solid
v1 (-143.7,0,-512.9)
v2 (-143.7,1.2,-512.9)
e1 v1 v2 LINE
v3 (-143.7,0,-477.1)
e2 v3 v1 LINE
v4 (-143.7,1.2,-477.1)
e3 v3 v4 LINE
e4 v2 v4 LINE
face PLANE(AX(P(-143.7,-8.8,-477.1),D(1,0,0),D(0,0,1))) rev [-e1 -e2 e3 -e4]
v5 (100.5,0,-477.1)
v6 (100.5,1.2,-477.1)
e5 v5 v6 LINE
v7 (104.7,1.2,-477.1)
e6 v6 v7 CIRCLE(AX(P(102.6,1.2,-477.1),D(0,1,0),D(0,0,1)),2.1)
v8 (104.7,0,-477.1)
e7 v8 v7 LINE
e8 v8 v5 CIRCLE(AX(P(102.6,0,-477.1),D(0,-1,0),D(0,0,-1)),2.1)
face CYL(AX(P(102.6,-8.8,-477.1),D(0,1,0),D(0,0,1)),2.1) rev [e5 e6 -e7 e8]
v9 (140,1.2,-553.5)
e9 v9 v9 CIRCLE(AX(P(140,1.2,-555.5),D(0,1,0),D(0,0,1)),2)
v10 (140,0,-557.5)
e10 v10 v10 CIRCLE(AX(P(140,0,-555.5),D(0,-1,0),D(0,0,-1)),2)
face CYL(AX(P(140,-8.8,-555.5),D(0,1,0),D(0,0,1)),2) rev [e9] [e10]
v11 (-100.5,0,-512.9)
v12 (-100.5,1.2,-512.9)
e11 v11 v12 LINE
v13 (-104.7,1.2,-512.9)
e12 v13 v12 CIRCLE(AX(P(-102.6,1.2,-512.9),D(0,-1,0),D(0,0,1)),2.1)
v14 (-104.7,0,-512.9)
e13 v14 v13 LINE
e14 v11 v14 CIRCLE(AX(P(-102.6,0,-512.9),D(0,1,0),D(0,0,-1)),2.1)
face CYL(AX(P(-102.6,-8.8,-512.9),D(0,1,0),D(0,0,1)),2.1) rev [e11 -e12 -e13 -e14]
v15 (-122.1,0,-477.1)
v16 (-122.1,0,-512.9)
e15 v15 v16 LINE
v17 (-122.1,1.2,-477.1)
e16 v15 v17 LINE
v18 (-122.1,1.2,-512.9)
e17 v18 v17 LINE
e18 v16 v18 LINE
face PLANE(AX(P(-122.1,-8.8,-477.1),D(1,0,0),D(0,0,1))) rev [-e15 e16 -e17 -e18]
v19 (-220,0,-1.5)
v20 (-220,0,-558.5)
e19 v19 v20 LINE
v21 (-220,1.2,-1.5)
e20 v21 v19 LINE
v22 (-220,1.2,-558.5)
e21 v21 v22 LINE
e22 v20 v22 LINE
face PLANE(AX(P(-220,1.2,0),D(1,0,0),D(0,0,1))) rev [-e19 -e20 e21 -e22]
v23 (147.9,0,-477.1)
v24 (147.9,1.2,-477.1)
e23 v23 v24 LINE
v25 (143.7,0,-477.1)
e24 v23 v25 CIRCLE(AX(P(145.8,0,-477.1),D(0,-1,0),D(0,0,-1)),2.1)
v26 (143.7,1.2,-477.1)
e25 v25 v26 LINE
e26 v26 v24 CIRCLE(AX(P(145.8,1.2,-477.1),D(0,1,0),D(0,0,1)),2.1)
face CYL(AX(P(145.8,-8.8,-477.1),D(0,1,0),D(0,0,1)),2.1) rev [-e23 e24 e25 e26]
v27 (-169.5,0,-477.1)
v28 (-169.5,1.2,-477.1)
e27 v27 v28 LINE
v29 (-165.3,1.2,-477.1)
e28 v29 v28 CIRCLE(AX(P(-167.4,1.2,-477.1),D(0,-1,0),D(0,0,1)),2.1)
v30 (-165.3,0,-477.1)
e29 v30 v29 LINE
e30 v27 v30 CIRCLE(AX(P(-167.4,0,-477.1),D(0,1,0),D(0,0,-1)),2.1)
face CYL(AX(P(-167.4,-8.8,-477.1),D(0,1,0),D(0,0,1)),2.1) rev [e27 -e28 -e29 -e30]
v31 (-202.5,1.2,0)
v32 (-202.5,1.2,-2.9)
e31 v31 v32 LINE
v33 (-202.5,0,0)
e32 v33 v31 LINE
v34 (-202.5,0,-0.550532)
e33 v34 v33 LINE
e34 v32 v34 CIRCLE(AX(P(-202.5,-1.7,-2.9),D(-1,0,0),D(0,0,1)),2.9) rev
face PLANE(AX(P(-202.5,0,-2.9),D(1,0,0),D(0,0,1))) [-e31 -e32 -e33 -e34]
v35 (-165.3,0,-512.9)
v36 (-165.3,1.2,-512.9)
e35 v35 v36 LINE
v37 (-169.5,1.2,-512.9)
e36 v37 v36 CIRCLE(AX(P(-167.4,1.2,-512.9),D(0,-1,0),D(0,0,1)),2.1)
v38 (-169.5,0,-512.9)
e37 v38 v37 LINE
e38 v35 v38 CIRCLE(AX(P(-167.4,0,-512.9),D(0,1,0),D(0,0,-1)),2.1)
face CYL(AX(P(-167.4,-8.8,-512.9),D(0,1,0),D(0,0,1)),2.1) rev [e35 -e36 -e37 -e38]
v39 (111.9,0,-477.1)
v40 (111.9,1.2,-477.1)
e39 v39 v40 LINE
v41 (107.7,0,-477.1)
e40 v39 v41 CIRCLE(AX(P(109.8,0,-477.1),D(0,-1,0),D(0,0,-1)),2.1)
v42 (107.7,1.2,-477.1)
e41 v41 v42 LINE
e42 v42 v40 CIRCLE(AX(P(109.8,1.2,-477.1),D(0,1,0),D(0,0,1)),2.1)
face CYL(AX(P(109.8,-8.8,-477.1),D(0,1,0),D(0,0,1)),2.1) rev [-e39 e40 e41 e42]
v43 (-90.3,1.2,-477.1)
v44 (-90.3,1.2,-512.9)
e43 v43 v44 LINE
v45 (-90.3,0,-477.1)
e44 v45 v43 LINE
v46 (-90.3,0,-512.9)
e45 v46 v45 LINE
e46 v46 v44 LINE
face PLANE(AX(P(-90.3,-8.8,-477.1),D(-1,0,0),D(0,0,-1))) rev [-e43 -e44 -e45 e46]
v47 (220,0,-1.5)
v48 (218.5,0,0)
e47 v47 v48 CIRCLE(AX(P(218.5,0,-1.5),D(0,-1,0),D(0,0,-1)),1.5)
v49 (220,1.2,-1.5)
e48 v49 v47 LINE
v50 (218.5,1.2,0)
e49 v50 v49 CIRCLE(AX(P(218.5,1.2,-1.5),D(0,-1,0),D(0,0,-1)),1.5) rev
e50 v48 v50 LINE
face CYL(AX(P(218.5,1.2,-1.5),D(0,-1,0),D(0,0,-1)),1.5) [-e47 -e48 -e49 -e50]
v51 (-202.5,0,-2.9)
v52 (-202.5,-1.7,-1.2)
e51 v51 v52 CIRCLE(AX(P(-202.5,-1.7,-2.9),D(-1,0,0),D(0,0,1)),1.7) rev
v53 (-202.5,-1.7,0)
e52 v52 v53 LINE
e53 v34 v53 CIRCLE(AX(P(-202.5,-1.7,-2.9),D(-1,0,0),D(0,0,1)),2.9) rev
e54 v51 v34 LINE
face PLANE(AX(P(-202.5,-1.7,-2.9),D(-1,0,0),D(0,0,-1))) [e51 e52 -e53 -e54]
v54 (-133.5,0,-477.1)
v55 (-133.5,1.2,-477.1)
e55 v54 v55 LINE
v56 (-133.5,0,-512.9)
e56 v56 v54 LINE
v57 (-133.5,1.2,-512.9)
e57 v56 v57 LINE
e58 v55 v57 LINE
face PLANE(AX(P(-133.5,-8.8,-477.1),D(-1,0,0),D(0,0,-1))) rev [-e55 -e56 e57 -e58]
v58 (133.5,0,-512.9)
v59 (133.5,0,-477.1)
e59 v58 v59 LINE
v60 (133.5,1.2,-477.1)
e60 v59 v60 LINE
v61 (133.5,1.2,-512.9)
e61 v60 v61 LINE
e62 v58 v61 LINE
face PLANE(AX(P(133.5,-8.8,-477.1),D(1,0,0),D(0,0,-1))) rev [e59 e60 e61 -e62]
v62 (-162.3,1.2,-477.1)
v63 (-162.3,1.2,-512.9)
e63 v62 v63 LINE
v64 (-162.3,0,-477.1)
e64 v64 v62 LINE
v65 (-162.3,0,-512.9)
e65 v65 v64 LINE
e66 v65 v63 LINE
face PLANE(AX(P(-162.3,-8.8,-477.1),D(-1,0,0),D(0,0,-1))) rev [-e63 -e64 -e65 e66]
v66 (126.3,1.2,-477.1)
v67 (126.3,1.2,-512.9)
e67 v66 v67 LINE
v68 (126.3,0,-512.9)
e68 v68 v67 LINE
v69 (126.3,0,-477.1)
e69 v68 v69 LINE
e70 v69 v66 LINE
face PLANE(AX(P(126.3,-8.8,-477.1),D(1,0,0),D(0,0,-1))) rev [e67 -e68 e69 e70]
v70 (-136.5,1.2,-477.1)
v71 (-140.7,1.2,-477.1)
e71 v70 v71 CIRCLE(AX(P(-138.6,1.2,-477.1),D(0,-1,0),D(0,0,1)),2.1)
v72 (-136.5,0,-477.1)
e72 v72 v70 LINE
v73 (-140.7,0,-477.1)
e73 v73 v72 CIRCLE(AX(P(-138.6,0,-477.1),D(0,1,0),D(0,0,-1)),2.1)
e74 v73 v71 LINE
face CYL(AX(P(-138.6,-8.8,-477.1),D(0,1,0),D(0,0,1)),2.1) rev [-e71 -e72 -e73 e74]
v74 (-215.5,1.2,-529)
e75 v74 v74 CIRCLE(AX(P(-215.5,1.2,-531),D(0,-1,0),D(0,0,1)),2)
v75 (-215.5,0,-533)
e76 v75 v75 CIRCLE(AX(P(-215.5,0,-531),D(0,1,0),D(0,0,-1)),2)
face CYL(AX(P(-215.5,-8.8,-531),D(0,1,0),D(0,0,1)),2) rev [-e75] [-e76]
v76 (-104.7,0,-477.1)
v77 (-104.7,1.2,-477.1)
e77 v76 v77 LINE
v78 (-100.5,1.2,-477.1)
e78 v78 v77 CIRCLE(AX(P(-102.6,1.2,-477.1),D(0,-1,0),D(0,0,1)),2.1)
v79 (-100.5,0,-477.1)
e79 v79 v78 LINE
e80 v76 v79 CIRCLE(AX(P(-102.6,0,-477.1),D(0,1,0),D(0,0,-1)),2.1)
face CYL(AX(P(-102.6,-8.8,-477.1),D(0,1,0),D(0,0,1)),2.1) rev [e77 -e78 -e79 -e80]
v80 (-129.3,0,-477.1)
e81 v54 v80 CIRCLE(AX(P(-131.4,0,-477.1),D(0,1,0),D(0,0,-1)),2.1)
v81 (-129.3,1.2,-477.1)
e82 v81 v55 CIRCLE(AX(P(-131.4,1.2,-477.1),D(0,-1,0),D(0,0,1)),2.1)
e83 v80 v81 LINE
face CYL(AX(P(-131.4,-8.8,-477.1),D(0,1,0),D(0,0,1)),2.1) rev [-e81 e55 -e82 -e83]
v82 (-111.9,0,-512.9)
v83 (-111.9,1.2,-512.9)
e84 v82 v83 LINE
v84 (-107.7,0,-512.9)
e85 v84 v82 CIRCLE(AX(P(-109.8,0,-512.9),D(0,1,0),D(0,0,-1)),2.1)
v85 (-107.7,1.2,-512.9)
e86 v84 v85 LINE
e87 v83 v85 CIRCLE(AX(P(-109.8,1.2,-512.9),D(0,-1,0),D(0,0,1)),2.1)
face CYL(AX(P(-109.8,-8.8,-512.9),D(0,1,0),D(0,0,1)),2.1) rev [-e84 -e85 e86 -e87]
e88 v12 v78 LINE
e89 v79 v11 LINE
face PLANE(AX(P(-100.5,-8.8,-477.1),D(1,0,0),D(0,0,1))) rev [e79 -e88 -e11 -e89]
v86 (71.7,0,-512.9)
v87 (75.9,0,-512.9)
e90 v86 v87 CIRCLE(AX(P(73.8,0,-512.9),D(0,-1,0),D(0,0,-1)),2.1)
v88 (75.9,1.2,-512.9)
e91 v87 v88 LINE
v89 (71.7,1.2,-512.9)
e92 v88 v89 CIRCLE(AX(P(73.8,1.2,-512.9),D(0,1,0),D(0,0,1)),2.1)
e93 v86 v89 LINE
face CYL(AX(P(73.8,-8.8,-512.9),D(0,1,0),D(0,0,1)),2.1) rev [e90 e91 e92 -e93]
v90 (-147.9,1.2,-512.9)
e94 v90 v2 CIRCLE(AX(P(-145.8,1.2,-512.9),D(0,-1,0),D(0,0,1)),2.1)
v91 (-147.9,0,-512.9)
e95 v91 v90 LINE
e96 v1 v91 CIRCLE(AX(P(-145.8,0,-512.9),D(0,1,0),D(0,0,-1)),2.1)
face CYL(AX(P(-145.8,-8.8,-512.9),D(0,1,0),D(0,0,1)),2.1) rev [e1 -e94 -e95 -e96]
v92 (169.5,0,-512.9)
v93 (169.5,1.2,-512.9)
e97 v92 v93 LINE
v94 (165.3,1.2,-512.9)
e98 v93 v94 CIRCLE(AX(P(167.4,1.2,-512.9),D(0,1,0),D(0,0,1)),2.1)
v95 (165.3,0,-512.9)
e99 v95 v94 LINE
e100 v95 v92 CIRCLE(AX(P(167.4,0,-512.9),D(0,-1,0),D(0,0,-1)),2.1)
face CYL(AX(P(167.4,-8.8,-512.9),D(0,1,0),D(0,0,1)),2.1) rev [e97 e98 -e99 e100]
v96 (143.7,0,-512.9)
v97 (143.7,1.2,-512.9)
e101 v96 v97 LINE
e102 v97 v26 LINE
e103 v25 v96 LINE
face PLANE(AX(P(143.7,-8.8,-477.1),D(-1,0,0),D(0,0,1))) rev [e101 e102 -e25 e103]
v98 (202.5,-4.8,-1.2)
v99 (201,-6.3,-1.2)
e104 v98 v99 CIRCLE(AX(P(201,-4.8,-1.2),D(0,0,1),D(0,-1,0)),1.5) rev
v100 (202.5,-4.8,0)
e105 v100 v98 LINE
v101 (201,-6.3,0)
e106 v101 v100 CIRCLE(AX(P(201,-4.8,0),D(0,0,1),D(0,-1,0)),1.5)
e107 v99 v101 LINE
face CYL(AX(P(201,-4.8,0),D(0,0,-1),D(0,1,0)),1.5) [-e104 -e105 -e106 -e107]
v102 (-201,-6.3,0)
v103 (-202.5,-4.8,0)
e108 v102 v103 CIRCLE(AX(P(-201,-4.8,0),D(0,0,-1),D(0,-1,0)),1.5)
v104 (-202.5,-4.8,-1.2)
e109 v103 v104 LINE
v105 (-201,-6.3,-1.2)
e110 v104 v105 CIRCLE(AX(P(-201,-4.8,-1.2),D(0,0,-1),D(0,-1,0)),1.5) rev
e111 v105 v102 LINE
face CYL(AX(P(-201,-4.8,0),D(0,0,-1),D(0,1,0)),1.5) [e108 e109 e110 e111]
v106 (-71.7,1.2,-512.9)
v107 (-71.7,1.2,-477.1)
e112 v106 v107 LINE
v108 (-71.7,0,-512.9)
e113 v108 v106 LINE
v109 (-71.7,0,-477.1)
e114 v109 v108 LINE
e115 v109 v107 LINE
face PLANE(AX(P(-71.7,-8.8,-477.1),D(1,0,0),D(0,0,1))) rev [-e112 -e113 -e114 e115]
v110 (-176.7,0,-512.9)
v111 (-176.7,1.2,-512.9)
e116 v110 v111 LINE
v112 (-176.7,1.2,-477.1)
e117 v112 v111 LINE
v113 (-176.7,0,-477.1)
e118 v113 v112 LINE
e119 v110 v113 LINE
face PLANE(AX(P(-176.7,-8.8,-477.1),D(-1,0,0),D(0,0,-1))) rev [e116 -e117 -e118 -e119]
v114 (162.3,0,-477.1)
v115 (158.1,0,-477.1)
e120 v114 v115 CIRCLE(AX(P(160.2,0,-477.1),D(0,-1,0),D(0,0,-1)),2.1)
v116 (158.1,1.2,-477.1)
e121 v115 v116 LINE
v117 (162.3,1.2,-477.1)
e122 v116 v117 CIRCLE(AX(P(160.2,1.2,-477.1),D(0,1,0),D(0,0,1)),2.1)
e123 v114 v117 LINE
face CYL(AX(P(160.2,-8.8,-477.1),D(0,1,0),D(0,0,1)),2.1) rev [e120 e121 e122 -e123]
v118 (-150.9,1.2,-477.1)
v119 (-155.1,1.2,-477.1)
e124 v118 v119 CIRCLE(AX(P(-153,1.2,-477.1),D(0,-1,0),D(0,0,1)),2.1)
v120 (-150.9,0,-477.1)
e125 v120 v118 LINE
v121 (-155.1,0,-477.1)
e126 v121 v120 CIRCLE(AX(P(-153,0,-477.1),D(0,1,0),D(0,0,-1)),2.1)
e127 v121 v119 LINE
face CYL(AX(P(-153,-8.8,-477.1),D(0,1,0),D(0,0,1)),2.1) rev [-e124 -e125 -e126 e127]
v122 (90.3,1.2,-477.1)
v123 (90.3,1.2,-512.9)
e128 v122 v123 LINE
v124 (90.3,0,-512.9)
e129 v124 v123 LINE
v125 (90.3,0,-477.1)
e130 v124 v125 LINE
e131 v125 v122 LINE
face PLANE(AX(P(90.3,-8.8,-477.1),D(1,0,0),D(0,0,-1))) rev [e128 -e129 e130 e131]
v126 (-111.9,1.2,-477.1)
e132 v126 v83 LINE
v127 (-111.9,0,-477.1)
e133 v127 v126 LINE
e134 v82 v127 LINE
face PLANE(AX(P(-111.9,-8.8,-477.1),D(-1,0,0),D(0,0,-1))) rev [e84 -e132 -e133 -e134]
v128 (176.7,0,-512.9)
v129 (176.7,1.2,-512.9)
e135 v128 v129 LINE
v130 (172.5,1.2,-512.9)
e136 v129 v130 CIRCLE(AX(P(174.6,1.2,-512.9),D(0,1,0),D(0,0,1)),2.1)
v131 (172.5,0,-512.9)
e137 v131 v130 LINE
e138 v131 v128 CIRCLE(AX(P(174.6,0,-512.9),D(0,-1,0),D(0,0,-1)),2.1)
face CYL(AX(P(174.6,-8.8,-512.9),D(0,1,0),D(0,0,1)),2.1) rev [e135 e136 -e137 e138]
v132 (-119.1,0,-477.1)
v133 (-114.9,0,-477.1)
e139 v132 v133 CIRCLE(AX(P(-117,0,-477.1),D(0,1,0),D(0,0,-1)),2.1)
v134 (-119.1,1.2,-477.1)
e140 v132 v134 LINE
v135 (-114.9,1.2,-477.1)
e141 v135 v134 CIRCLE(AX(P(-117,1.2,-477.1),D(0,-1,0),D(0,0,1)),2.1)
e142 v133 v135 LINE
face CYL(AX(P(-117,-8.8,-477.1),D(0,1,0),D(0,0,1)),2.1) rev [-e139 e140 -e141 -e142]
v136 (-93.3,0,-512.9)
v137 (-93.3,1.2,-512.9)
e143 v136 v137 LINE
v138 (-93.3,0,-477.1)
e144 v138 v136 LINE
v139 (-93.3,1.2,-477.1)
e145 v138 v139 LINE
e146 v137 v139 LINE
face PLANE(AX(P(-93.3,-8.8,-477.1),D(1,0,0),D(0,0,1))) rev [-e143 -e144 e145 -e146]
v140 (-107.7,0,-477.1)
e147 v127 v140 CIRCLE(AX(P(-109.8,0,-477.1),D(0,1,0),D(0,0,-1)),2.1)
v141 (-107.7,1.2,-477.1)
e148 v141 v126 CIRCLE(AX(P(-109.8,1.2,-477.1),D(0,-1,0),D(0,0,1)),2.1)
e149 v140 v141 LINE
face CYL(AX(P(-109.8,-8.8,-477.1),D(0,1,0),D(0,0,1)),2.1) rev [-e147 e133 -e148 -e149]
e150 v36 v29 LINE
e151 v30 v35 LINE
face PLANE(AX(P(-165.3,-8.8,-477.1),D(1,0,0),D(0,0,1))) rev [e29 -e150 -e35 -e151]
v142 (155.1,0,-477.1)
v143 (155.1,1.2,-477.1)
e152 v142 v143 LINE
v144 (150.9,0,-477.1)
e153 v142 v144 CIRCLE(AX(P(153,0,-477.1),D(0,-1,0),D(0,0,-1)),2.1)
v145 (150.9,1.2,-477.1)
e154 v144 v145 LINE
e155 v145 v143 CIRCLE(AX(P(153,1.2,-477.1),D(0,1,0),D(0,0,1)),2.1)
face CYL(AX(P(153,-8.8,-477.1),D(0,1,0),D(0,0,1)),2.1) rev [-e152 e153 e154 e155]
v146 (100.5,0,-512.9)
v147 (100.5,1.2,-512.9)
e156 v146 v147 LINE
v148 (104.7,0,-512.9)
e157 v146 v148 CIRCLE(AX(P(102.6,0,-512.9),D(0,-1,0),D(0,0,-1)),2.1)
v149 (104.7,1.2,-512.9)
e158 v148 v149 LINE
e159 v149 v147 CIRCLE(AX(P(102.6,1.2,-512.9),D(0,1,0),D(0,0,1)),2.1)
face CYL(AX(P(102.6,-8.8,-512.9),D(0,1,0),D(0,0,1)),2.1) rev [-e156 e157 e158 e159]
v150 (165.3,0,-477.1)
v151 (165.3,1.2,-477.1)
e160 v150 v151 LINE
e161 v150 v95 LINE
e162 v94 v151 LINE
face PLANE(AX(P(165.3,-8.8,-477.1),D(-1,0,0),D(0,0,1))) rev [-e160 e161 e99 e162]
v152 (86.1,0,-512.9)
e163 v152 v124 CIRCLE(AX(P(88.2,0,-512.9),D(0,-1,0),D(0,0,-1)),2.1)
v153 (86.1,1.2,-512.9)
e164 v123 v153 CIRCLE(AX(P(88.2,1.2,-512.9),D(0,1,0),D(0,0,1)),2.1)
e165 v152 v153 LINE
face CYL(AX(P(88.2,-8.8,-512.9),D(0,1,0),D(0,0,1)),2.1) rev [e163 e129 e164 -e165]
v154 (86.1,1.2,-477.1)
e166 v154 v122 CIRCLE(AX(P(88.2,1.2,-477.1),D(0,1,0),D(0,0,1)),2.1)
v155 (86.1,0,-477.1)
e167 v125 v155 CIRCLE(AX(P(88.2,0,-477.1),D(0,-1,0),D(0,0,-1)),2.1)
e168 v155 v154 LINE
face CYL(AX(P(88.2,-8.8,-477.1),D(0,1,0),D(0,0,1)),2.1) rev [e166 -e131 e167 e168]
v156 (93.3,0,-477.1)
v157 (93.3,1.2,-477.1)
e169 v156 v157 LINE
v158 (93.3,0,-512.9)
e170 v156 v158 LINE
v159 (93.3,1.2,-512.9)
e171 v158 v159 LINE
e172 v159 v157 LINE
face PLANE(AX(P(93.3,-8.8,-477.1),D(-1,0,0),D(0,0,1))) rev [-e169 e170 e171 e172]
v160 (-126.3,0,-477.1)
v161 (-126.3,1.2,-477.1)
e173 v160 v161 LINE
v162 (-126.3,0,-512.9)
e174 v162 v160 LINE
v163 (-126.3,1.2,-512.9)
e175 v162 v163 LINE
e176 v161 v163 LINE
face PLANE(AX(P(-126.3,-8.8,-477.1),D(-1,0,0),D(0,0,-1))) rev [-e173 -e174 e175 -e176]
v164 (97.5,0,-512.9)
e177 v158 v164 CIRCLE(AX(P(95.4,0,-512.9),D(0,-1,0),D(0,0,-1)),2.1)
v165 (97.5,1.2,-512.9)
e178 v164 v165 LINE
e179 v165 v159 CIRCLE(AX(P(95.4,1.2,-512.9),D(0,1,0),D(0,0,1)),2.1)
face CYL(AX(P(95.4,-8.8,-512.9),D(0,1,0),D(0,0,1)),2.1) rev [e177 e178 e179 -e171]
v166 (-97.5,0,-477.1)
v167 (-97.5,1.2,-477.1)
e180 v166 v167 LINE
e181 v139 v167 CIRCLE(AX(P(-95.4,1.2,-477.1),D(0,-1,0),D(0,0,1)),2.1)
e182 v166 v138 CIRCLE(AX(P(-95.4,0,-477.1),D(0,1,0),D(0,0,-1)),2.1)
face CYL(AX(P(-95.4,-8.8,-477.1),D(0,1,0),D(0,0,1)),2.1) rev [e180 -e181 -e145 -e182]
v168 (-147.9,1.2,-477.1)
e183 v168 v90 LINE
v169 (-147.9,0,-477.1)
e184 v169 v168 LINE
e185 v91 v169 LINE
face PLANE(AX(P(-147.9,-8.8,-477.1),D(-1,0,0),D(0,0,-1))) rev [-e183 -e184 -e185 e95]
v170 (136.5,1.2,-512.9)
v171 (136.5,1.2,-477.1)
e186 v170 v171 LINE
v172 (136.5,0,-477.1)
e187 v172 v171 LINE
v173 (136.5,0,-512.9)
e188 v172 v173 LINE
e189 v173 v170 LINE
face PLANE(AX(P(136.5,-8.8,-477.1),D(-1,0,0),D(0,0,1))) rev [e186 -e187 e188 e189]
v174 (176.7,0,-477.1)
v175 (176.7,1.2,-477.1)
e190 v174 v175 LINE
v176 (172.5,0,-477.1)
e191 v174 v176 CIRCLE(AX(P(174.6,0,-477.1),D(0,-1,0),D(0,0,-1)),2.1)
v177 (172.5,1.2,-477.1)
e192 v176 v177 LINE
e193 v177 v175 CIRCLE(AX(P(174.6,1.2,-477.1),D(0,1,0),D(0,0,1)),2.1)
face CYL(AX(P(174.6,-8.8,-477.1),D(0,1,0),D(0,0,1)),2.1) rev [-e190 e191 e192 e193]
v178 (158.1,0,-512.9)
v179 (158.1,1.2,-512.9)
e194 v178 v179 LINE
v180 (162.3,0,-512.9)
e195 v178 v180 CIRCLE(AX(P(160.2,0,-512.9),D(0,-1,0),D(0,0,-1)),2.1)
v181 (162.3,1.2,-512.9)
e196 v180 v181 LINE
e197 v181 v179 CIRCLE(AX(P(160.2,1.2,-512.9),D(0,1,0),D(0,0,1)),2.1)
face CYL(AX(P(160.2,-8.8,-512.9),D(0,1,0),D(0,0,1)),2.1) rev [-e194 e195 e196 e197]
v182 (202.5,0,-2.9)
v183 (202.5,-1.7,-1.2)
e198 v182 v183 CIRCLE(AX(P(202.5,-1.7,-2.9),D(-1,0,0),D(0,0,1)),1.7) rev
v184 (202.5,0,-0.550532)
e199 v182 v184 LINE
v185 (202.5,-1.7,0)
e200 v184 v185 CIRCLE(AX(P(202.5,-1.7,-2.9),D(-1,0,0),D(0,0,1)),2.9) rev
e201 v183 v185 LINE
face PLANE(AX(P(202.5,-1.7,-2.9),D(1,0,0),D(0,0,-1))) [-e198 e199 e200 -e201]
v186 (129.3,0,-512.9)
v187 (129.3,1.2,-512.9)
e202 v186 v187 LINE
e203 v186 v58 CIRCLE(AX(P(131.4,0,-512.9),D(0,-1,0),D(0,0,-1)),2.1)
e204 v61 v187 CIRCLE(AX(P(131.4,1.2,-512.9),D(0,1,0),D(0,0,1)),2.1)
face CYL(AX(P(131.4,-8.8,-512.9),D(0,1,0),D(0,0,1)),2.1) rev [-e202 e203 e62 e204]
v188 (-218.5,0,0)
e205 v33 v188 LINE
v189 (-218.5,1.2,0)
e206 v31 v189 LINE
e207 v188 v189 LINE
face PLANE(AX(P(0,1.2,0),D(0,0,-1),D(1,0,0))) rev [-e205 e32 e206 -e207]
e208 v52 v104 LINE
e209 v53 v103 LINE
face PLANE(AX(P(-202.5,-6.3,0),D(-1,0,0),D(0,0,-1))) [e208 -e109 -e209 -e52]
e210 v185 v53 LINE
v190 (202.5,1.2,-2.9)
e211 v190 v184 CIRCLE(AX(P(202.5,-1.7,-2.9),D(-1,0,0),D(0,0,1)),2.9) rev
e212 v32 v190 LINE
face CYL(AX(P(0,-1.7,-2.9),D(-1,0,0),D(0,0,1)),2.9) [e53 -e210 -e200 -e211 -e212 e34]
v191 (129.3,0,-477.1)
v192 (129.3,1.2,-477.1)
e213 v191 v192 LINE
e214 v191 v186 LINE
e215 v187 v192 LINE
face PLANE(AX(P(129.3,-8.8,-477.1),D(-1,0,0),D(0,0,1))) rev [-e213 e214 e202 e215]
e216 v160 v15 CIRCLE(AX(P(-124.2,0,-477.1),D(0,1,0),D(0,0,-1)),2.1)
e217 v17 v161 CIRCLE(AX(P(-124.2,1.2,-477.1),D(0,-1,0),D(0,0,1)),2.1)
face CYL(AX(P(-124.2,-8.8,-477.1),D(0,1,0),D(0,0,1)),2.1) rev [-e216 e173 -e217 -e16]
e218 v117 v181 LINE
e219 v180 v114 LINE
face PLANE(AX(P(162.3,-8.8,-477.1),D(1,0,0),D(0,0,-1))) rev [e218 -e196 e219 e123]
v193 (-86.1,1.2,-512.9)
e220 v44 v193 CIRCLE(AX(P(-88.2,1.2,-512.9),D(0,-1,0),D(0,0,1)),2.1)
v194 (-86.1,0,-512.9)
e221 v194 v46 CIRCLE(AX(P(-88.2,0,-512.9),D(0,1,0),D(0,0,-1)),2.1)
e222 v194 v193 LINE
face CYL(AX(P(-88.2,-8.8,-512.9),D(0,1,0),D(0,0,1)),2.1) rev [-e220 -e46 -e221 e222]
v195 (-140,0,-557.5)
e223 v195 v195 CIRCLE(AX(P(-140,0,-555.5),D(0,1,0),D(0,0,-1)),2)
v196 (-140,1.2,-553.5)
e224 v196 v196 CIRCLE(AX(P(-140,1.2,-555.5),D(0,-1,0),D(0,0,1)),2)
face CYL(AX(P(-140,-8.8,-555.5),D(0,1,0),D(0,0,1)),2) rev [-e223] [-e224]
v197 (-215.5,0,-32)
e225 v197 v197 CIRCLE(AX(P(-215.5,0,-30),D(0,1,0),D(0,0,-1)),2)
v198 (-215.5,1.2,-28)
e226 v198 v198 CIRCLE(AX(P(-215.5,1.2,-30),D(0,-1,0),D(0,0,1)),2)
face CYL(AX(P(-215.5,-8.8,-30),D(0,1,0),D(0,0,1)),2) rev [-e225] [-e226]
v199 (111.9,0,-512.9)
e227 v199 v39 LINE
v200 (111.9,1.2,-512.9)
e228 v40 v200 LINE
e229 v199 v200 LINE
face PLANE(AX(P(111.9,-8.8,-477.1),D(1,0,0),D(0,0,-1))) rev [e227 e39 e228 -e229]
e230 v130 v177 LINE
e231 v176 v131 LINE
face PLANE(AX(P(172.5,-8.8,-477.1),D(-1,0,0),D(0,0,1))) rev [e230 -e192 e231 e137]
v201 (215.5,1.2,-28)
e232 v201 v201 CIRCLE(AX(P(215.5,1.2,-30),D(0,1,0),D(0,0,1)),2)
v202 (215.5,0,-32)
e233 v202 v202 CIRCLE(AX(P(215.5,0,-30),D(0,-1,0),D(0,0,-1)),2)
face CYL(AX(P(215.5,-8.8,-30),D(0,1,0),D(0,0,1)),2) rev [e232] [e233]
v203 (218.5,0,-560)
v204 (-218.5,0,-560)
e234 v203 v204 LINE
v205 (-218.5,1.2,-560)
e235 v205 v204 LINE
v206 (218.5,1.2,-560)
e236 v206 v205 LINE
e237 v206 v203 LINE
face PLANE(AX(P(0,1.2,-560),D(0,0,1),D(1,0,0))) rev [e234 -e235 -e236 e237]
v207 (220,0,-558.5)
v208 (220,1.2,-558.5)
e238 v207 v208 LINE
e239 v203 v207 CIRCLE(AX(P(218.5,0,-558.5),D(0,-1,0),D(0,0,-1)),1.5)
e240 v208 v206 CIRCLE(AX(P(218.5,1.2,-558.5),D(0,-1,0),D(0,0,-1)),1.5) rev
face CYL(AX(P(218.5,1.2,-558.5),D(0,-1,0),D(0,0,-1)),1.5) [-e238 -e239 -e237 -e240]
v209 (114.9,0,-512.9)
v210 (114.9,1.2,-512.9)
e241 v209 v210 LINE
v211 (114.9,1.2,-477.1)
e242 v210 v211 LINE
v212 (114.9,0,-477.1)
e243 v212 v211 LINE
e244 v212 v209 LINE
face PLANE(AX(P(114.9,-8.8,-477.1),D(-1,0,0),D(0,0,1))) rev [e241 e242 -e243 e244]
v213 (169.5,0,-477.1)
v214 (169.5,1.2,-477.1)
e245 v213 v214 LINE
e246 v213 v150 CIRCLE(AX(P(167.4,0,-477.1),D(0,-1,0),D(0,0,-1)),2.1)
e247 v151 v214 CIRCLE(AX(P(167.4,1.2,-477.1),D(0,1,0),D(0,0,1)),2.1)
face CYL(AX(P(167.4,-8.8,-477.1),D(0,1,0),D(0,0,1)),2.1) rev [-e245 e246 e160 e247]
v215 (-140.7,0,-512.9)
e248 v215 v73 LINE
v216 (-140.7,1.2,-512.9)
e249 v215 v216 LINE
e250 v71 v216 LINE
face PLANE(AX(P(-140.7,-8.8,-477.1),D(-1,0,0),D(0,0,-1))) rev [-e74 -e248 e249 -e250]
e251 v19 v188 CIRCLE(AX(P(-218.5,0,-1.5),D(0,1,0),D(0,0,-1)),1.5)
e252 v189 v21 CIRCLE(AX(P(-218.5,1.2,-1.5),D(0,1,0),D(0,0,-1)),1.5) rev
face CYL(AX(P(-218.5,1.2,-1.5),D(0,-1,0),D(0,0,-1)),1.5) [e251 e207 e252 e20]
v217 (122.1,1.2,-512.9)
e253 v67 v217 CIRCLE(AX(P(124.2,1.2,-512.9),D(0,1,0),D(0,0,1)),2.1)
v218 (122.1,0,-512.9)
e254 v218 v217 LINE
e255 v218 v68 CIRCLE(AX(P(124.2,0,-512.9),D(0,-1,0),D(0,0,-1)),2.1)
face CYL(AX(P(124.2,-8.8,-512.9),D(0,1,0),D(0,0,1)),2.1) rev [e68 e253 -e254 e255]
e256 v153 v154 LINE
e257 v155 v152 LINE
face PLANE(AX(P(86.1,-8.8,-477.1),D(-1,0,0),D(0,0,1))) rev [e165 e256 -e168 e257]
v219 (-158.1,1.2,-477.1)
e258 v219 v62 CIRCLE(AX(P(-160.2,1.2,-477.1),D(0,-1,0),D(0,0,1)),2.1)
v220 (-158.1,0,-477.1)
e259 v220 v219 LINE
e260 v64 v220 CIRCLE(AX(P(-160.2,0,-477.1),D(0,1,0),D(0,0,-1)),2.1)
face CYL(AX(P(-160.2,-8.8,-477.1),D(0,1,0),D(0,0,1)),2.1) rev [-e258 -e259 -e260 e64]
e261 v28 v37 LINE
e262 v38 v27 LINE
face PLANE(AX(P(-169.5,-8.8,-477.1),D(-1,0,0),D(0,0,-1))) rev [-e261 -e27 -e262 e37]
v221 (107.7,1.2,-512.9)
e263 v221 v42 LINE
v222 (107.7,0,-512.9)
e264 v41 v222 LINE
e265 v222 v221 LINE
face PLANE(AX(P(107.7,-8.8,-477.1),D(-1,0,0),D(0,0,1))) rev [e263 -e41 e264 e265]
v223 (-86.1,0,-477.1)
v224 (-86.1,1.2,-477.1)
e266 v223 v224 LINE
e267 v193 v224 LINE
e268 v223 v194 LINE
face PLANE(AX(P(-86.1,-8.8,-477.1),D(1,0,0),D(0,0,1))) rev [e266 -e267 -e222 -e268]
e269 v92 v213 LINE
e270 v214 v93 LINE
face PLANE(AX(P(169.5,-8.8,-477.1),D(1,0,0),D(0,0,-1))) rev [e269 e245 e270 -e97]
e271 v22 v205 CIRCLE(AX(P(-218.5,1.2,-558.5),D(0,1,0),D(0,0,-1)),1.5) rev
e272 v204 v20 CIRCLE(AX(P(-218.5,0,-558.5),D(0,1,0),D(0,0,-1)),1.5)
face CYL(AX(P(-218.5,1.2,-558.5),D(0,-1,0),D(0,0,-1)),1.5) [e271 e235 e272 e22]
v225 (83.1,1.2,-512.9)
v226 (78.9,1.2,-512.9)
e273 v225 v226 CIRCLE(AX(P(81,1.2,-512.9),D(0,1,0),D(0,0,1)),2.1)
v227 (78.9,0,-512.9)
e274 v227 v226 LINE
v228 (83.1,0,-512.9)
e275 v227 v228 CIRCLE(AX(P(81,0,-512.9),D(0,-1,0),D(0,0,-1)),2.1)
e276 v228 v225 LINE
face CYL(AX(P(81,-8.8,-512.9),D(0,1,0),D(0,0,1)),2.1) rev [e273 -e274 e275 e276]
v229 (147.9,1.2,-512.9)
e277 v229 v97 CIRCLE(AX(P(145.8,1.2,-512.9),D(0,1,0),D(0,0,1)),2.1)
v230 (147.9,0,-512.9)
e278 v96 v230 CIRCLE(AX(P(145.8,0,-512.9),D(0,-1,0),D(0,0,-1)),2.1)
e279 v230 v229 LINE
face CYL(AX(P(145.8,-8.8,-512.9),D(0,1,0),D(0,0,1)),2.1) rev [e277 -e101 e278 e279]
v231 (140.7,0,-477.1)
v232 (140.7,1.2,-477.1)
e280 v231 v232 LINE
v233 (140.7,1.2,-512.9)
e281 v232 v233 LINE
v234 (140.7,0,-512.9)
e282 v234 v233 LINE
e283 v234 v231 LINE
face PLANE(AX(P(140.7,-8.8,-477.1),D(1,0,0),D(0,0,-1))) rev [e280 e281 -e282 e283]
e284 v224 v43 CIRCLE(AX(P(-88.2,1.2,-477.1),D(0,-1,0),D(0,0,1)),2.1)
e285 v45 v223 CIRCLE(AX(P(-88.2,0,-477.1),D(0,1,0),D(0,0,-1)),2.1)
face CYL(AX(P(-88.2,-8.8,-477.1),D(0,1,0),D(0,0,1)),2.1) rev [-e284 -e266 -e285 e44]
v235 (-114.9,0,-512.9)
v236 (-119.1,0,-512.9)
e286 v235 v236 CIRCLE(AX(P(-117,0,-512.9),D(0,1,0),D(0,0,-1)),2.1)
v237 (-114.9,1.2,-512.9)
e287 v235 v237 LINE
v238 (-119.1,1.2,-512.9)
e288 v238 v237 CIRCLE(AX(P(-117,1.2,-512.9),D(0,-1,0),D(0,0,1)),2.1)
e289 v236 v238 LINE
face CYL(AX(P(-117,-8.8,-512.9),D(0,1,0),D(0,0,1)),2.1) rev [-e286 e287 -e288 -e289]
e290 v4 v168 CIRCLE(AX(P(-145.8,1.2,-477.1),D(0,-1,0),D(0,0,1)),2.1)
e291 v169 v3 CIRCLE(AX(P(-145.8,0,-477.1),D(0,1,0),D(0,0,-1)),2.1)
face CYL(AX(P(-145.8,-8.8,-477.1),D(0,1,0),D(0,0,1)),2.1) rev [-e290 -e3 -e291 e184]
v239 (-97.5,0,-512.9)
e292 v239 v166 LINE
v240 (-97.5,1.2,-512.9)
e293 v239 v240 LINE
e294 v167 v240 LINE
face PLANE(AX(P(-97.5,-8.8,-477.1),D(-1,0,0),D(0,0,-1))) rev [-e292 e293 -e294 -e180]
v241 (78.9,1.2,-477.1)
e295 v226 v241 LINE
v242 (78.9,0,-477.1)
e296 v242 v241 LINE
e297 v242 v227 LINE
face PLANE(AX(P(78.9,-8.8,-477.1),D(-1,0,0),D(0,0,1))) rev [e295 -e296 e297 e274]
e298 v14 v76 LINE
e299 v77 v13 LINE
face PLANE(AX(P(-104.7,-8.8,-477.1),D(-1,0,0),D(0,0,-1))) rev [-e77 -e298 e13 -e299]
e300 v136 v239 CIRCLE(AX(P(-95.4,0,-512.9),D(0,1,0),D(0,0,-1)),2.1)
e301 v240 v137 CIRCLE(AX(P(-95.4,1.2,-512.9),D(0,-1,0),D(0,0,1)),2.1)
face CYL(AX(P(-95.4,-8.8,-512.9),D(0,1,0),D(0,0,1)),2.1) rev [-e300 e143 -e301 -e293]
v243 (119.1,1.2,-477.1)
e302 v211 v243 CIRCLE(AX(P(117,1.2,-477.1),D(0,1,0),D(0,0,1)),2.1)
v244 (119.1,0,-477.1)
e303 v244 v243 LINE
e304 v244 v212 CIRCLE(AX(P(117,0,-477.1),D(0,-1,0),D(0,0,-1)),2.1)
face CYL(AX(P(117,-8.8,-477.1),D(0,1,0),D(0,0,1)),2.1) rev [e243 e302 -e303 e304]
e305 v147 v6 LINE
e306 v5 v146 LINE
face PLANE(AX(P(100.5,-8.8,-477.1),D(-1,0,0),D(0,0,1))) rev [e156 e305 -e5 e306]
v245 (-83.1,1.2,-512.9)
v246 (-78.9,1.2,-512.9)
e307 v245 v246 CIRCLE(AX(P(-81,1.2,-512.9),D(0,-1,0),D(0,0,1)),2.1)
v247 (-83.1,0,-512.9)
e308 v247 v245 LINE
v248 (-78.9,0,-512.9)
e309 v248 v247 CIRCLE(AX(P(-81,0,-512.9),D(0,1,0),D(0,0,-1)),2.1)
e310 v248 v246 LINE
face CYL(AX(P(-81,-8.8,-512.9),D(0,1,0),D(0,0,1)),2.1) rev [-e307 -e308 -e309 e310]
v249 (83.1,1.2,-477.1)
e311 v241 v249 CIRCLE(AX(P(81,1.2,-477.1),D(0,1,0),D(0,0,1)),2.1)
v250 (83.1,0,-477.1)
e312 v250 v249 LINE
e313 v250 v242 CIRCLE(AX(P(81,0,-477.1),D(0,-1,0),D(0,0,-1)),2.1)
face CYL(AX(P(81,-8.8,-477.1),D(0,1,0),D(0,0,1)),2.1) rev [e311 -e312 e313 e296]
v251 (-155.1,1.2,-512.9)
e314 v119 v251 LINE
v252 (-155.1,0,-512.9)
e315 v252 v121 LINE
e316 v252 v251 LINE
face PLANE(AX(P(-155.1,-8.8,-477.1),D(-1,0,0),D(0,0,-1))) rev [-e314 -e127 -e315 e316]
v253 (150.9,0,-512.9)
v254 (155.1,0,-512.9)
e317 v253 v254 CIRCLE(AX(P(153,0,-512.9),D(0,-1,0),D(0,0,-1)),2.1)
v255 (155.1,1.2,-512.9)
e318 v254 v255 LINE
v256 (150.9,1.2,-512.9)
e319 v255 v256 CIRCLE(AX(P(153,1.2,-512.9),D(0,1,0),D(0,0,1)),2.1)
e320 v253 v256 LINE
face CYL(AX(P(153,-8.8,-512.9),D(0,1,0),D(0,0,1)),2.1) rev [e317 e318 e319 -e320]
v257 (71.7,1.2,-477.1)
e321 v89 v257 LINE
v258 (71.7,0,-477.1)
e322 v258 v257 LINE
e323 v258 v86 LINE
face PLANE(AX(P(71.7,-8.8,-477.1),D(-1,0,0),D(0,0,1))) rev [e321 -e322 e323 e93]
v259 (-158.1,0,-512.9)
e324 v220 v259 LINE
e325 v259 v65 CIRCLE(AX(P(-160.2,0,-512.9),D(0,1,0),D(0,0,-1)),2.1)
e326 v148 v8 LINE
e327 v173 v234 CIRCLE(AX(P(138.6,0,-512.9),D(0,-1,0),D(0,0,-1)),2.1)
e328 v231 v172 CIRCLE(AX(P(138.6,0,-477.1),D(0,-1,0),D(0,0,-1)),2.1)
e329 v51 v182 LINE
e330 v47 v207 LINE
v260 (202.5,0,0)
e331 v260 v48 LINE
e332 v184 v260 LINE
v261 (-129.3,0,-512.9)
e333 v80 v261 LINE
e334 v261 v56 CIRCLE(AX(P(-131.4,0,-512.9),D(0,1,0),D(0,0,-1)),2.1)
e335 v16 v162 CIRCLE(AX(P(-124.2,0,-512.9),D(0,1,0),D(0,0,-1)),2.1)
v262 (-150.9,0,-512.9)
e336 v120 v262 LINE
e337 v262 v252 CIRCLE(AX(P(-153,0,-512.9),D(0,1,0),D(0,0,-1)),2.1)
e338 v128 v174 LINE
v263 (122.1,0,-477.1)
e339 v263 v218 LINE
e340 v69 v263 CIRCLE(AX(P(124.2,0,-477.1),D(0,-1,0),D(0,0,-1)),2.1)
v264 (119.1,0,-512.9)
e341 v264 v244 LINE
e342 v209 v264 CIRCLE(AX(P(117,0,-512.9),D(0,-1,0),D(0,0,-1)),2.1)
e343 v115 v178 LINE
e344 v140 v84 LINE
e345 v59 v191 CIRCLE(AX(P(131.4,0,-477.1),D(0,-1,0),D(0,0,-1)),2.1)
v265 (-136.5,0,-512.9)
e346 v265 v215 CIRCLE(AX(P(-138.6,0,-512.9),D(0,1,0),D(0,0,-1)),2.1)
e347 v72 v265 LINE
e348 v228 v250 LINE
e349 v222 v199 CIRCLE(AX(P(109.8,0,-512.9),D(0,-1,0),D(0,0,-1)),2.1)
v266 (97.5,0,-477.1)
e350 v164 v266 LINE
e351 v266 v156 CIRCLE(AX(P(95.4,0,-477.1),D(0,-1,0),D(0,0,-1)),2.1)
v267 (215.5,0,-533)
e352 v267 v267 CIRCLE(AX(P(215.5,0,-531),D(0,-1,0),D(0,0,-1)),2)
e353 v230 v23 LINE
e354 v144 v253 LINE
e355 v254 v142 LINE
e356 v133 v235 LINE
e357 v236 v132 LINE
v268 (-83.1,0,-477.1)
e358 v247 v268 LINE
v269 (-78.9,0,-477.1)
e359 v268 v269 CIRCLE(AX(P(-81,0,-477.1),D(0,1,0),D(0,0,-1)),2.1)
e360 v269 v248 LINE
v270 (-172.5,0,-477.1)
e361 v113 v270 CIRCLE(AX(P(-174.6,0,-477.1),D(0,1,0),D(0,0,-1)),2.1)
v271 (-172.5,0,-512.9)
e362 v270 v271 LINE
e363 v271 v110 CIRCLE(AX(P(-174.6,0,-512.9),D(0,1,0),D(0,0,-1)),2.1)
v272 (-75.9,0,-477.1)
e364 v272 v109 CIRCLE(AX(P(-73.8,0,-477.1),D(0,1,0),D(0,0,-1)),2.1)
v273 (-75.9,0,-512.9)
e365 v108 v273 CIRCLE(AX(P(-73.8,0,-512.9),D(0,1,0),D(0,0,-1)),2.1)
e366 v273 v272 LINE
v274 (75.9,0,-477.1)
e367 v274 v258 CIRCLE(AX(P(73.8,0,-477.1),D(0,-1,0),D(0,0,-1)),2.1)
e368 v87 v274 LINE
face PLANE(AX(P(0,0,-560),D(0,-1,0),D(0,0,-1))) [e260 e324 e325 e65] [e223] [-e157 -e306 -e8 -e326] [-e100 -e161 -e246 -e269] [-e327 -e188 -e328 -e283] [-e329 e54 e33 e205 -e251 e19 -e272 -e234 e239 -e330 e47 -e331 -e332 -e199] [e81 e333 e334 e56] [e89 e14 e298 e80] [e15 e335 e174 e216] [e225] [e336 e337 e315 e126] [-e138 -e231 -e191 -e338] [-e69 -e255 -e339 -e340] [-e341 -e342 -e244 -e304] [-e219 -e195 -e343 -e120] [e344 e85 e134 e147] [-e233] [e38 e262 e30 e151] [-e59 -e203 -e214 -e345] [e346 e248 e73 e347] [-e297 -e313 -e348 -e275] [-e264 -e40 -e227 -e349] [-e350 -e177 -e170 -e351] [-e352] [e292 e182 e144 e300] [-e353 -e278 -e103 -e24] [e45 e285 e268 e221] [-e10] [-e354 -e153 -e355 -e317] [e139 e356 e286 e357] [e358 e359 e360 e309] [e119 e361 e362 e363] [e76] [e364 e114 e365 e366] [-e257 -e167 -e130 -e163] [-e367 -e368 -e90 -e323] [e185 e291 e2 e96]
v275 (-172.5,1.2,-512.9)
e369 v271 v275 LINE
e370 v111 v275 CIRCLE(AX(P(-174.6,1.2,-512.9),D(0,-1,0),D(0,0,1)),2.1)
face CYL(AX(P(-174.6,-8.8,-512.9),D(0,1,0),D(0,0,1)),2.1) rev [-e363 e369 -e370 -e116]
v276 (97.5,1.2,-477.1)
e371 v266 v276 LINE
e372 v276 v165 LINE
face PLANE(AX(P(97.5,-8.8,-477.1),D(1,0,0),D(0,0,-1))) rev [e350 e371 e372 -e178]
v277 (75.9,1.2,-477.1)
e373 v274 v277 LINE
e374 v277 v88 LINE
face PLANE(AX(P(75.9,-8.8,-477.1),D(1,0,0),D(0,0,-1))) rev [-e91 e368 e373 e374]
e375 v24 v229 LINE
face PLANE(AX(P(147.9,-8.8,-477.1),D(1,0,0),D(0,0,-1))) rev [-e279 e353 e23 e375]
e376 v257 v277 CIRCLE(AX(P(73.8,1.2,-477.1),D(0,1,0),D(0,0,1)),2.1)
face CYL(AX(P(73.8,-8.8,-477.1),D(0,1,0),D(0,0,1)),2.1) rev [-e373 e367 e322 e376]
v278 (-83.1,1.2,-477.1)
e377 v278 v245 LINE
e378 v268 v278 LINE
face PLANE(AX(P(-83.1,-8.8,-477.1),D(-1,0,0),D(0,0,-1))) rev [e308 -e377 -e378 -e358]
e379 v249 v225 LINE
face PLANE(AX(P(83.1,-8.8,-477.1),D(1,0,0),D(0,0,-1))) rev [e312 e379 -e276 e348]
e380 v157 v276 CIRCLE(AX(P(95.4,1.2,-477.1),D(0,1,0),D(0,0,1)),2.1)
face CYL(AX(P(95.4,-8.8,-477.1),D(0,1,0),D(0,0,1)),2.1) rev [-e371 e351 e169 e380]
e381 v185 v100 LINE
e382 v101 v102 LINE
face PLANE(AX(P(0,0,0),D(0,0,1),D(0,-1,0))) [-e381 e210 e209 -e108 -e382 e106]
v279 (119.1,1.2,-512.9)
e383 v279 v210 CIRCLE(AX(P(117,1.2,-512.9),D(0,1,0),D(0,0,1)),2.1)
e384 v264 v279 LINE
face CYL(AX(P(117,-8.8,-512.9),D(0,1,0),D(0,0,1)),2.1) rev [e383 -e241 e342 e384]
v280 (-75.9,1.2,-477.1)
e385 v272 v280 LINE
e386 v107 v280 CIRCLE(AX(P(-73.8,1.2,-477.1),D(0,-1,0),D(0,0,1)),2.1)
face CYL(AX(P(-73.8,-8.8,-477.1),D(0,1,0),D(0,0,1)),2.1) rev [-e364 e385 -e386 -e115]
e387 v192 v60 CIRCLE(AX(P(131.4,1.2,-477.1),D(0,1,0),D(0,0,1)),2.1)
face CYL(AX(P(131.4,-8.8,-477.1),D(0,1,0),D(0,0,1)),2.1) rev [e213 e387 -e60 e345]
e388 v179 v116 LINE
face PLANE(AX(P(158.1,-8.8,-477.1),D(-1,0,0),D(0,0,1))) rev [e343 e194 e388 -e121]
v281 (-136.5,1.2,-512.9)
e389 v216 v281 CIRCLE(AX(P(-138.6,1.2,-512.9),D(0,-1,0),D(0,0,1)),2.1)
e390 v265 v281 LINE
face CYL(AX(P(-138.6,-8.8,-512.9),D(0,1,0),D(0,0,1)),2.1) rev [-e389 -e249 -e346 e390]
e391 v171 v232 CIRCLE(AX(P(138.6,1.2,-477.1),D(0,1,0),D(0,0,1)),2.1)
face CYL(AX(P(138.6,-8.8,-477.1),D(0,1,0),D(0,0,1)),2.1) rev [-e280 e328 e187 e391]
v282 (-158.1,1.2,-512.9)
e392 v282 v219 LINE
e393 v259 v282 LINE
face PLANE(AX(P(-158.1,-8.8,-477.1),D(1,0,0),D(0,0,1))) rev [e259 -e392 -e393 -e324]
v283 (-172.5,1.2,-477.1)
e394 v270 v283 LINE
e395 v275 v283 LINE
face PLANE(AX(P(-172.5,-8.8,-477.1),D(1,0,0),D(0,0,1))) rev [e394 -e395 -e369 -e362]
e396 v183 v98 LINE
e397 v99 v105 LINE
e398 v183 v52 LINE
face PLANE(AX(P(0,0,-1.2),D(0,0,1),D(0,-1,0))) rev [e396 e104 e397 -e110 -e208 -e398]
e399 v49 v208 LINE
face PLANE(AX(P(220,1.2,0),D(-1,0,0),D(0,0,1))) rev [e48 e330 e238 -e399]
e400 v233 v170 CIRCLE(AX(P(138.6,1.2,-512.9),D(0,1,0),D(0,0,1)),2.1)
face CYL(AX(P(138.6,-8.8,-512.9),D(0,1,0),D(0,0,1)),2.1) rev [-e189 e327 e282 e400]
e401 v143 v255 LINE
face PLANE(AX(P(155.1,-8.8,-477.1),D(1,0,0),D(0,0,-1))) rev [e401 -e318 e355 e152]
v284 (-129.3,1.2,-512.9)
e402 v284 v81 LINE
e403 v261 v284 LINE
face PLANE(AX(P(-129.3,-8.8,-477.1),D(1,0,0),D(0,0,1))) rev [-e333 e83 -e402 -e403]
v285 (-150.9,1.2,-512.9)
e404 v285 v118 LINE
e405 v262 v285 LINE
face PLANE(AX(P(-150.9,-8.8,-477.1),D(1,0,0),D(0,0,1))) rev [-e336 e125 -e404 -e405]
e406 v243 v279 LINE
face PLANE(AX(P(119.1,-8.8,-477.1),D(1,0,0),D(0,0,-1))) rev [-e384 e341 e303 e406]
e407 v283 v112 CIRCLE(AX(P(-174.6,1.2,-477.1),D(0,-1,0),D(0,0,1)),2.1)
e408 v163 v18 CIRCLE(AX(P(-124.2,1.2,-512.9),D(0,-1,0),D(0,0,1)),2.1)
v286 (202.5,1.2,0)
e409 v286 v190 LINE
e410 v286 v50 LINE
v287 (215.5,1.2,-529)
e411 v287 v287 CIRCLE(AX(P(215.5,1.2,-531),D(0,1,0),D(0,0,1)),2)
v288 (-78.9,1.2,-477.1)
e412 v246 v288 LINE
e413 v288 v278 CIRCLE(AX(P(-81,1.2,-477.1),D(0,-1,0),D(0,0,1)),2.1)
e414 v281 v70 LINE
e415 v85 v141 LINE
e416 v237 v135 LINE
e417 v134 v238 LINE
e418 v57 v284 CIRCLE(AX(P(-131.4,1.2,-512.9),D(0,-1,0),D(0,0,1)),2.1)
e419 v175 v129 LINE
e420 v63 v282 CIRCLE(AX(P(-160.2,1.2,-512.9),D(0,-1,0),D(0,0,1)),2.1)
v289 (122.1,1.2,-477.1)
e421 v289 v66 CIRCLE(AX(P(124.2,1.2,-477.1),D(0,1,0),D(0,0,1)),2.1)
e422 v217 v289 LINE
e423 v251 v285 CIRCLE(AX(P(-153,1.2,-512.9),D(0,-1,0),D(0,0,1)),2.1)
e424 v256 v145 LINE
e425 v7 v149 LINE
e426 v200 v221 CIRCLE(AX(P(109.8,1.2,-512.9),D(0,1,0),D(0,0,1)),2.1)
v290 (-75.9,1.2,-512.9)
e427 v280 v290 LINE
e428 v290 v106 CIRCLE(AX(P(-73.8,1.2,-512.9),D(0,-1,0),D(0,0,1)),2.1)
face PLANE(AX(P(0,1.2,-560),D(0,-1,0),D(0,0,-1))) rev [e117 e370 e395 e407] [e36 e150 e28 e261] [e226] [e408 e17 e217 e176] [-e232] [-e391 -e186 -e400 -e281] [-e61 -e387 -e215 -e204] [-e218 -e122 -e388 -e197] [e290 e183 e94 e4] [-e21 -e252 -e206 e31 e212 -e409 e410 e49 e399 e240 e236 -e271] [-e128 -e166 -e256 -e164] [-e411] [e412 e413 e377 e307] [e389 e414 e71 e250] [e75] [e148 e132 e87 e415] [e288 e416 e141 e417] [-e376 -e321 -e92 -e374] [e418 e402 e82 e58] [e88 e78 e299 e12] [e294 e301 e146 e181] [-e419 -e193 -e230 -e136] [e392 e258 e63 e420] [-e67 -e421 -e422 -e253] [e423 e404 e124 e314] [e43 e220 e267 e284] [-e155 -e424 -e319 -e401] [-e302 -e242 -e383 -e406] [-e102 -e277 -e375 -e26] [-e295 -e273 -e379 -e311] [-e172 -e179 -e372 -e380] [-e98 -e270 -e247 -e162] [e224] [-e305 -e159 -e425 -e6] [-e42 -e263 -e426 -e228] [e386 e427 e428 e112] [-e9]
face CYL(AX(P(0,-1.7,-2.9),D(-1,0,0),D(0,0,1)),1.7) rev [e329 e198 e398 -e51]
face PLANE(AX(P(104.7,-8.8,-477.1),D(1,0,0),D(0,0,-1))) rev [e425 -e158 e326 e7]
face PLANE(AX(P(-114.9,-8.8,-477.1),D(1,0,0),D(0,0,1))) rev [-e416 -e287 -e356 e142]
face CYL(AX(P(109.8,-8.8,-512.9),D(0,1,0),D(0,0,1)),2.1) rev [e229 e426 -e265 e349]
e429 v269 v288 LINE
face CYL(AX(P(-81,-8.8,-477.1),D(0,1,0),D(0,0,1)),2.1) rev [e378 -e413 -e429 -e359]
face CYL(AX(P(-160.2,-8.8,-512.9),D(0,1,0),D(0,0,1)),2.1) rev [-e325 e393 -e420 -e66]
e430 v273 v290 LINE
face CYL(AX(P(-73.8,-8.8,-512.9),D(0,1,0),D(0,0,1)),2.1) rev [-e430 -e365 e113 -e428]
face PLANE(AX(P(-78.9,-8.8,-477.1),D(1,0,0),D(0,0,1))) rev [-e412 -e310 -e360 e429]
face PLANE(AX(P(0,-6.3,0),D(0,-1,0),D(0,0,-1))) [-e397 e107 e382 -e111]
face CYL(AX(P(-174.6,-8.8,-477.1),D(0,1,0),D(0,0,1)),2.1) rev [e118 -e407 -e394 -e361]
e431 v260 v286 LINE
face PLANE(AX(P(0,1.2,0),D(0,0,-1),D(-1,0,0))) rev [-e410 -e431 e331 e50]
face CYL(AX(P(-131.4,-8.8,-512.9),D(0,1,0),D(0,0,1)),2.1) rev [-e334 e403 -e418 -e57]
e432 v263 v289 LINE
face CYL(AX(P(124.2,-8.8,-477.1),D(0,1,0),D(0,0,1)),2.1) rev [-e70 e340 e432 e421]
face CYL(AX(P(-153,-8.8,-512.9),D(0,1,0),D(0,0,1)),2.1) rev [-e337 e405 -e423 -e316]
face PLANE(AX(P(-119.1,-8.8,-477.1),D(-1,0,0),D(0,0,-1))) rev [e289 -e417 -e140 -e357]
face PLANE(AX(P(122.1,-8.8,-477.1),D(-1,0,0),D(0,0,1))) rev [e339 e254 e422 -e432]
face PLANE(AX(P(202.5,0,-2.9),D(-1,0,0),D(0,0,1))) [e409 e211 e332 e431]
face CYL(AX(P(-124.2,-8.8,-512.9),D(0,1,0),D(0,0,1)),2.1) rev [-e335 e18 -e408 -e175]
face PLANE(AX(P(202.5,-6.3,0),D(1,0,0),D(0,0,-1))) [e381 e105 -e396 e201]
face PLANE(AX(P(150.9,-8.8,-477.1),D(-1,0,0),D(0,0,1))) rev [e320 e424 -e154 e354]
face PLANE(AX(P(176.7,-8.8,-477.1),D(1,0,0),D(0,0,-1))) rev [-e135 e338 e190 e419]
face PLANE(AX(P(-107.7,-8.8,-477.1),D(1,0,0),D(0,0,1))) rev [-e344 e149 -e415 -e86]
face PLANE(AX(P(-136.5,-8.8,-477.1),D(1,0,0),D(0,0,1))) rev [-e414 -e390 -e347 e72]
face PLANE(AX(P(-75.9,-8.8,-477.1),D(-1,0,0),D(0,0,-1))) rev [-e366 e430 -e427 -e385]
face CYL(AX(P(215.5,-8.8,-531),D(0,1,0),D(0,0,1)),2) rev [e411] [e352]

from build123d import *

# Parameters (mm, degrees)
SKETCH1_W                    = 220
SKETCH1_H                    = 560
BASE_FLANGE1_DEPTH           = 1.2
EDGE_FLANGE1_STRIP_W         = 8.2
EDGE_FLANGE1_STRIP_H         = 1.2
EDGE_FLANGE1_STRIP_CUT_DEPTH = 202.5
EDGE_FLANGE1_DEPTH           = 202.5
FILLET1_R                    = 1.5
SKETCH6_R                    = 2
CUT_EXTRUDE1_DEPTH           = 10
CUT_EXTRUDE2_DEPTH           = 10
LPATTERN1_COUNT              = 15
LPATTERN1_PITCH              = 7.2
FILLET2_R                    = 1.5


# Sheet-metal steps are written as plain solids
with BuildPart() as part:
    # Sketch1 → Base-Flange1 (new body)
    with BuildSketch(Plane(origin=(0, 0, 0), x_dir=(1, 0, 0), z_dir=(0, 1, 0))):
        with Locations((110, 280)):
            Rectangle(SKETCH1_W, SKETCH1_H)
    extrude(amount=BASE_FLANGE1_DEPTH)

    # Edge-Flange1 strip (across the edge) → Edge-Flange1 strip cut (cut)
    with BuildSketch(Plane(origin=(202.5, 0, 0), x_dir=(0, 0, -1), z_dir=(-1, 0, 0))):
        with Locations((-1.2, -0.6)):
            Rectangle(EDGE_FLANGE1_STRIP_W, EDGE_FLANGE1_STRIP_H)
    extrude(amount=EDGE_FLANGE1_STRIP_CUT_DEPTH, mode=Mode.SUBTRACT)

    # Edge-Flange1 section (across the edge) → Edge-Flange1 (add)
    with BuildSketch(Plane(origin=(202.5, 0, 0), x_dir=(0, 0, -1), z_dir=(-1, 0, 0))):
        with BuildLine():
            Line((0, 1.7), (0, 6.3))
            Line((0, 6.3), (1.2, 6.3))
            Line((1.2, 6.3), (1.2, 1.7))
            ThreePointArc((1.2, 1.7), (1.697918472, 0.497918472), (2.9, 0))
            Line((2.9, 0), (2.9, -1.2))
            ThreePointArc((2.9, -1.2), (0.849390335, -0.350609665), (0, 1.7))
        make_face()
    extrude(amount=EDGE_FLANGE1_DEPTH)

    # Fillet1
    fillet1_edges = [part.edges().sort_by_distance(p)[0] for p in [
        (202.5, -6.3, -0.6),
    ]]
    fillet(fillet1_edges, radius=FILLET1_R)

    # Sketch6 → Cut-Extrude1 (cut)
    with BuildSketch(Plane(origin=(0, 1.2, 0), x_dir=(1, 0, 0), z_dir=(0, 1, 0))):
        with Locations(Location((215.5, 531, 0), (0, 0, 270))):
            Circle(SKETCH6_R)
        with Locations(Location((215.5, 30, 0), (0, 0, 270))):
            Circle(SKETCH6_R)
        with Locations(Location((140, 555.5, 0), (0, 0, 270))):
            Circle(SKETCH6_R)
    extrude(amount=-CUT_EXTRUDE1_DEPTH, mode=Mode.SUBTRACT)

    # Sketch7 → Cut-Extrude2 (cut)
    with BuildSketch(Plane(origin=(0, 1.2, 0), x_dir=(1, 0, 0), z_dir=(0, 1, 0))):
        with BuildLine():
            Line((172.5, 477.1), (172.5, 512.9))
            ThreePointArc((172.5, 512.9), (174.6, 515), (176.7, 512.9))
            Line((176.7, 512.9), (176.7, 477.1))
            ThreePointArc((176.7, 477.1), (174.6, 475), (172.5, 477.1))
        make_face()
    cut_extrude2 = extrude(amount=-CUT_EXTRUDE2_DEPTH, mode=Mode.SUBTRACT)

    # LPattern1: Cut-Extrude2 ×15
    with Locations(*[(-i * LPATTERN1_PITCH, 0, 0) for i in range(1, LPATTERN1_COUNT)]):
        add(cut_extrude2, mode=Mode.SUBTRACT)

    # Fillet2
    fillet2_edges = [part.edges().sort_by_distance(p)[0] for p in [
        (220, 0.6, -560),
        (220, 0.6, 0),
    ]]
    fillet(fillet2_edges, radius=FILLET2_R)

    # Mirror1: part across plane


with BuildPart() as part_1:
    add(part.part)
    add(part.part.mirror(Plane(origin=(0, 1.2, 0), x_dir=(0, 0, 1), z_dir=(1, 0, 0))))


solid = part_1.part
